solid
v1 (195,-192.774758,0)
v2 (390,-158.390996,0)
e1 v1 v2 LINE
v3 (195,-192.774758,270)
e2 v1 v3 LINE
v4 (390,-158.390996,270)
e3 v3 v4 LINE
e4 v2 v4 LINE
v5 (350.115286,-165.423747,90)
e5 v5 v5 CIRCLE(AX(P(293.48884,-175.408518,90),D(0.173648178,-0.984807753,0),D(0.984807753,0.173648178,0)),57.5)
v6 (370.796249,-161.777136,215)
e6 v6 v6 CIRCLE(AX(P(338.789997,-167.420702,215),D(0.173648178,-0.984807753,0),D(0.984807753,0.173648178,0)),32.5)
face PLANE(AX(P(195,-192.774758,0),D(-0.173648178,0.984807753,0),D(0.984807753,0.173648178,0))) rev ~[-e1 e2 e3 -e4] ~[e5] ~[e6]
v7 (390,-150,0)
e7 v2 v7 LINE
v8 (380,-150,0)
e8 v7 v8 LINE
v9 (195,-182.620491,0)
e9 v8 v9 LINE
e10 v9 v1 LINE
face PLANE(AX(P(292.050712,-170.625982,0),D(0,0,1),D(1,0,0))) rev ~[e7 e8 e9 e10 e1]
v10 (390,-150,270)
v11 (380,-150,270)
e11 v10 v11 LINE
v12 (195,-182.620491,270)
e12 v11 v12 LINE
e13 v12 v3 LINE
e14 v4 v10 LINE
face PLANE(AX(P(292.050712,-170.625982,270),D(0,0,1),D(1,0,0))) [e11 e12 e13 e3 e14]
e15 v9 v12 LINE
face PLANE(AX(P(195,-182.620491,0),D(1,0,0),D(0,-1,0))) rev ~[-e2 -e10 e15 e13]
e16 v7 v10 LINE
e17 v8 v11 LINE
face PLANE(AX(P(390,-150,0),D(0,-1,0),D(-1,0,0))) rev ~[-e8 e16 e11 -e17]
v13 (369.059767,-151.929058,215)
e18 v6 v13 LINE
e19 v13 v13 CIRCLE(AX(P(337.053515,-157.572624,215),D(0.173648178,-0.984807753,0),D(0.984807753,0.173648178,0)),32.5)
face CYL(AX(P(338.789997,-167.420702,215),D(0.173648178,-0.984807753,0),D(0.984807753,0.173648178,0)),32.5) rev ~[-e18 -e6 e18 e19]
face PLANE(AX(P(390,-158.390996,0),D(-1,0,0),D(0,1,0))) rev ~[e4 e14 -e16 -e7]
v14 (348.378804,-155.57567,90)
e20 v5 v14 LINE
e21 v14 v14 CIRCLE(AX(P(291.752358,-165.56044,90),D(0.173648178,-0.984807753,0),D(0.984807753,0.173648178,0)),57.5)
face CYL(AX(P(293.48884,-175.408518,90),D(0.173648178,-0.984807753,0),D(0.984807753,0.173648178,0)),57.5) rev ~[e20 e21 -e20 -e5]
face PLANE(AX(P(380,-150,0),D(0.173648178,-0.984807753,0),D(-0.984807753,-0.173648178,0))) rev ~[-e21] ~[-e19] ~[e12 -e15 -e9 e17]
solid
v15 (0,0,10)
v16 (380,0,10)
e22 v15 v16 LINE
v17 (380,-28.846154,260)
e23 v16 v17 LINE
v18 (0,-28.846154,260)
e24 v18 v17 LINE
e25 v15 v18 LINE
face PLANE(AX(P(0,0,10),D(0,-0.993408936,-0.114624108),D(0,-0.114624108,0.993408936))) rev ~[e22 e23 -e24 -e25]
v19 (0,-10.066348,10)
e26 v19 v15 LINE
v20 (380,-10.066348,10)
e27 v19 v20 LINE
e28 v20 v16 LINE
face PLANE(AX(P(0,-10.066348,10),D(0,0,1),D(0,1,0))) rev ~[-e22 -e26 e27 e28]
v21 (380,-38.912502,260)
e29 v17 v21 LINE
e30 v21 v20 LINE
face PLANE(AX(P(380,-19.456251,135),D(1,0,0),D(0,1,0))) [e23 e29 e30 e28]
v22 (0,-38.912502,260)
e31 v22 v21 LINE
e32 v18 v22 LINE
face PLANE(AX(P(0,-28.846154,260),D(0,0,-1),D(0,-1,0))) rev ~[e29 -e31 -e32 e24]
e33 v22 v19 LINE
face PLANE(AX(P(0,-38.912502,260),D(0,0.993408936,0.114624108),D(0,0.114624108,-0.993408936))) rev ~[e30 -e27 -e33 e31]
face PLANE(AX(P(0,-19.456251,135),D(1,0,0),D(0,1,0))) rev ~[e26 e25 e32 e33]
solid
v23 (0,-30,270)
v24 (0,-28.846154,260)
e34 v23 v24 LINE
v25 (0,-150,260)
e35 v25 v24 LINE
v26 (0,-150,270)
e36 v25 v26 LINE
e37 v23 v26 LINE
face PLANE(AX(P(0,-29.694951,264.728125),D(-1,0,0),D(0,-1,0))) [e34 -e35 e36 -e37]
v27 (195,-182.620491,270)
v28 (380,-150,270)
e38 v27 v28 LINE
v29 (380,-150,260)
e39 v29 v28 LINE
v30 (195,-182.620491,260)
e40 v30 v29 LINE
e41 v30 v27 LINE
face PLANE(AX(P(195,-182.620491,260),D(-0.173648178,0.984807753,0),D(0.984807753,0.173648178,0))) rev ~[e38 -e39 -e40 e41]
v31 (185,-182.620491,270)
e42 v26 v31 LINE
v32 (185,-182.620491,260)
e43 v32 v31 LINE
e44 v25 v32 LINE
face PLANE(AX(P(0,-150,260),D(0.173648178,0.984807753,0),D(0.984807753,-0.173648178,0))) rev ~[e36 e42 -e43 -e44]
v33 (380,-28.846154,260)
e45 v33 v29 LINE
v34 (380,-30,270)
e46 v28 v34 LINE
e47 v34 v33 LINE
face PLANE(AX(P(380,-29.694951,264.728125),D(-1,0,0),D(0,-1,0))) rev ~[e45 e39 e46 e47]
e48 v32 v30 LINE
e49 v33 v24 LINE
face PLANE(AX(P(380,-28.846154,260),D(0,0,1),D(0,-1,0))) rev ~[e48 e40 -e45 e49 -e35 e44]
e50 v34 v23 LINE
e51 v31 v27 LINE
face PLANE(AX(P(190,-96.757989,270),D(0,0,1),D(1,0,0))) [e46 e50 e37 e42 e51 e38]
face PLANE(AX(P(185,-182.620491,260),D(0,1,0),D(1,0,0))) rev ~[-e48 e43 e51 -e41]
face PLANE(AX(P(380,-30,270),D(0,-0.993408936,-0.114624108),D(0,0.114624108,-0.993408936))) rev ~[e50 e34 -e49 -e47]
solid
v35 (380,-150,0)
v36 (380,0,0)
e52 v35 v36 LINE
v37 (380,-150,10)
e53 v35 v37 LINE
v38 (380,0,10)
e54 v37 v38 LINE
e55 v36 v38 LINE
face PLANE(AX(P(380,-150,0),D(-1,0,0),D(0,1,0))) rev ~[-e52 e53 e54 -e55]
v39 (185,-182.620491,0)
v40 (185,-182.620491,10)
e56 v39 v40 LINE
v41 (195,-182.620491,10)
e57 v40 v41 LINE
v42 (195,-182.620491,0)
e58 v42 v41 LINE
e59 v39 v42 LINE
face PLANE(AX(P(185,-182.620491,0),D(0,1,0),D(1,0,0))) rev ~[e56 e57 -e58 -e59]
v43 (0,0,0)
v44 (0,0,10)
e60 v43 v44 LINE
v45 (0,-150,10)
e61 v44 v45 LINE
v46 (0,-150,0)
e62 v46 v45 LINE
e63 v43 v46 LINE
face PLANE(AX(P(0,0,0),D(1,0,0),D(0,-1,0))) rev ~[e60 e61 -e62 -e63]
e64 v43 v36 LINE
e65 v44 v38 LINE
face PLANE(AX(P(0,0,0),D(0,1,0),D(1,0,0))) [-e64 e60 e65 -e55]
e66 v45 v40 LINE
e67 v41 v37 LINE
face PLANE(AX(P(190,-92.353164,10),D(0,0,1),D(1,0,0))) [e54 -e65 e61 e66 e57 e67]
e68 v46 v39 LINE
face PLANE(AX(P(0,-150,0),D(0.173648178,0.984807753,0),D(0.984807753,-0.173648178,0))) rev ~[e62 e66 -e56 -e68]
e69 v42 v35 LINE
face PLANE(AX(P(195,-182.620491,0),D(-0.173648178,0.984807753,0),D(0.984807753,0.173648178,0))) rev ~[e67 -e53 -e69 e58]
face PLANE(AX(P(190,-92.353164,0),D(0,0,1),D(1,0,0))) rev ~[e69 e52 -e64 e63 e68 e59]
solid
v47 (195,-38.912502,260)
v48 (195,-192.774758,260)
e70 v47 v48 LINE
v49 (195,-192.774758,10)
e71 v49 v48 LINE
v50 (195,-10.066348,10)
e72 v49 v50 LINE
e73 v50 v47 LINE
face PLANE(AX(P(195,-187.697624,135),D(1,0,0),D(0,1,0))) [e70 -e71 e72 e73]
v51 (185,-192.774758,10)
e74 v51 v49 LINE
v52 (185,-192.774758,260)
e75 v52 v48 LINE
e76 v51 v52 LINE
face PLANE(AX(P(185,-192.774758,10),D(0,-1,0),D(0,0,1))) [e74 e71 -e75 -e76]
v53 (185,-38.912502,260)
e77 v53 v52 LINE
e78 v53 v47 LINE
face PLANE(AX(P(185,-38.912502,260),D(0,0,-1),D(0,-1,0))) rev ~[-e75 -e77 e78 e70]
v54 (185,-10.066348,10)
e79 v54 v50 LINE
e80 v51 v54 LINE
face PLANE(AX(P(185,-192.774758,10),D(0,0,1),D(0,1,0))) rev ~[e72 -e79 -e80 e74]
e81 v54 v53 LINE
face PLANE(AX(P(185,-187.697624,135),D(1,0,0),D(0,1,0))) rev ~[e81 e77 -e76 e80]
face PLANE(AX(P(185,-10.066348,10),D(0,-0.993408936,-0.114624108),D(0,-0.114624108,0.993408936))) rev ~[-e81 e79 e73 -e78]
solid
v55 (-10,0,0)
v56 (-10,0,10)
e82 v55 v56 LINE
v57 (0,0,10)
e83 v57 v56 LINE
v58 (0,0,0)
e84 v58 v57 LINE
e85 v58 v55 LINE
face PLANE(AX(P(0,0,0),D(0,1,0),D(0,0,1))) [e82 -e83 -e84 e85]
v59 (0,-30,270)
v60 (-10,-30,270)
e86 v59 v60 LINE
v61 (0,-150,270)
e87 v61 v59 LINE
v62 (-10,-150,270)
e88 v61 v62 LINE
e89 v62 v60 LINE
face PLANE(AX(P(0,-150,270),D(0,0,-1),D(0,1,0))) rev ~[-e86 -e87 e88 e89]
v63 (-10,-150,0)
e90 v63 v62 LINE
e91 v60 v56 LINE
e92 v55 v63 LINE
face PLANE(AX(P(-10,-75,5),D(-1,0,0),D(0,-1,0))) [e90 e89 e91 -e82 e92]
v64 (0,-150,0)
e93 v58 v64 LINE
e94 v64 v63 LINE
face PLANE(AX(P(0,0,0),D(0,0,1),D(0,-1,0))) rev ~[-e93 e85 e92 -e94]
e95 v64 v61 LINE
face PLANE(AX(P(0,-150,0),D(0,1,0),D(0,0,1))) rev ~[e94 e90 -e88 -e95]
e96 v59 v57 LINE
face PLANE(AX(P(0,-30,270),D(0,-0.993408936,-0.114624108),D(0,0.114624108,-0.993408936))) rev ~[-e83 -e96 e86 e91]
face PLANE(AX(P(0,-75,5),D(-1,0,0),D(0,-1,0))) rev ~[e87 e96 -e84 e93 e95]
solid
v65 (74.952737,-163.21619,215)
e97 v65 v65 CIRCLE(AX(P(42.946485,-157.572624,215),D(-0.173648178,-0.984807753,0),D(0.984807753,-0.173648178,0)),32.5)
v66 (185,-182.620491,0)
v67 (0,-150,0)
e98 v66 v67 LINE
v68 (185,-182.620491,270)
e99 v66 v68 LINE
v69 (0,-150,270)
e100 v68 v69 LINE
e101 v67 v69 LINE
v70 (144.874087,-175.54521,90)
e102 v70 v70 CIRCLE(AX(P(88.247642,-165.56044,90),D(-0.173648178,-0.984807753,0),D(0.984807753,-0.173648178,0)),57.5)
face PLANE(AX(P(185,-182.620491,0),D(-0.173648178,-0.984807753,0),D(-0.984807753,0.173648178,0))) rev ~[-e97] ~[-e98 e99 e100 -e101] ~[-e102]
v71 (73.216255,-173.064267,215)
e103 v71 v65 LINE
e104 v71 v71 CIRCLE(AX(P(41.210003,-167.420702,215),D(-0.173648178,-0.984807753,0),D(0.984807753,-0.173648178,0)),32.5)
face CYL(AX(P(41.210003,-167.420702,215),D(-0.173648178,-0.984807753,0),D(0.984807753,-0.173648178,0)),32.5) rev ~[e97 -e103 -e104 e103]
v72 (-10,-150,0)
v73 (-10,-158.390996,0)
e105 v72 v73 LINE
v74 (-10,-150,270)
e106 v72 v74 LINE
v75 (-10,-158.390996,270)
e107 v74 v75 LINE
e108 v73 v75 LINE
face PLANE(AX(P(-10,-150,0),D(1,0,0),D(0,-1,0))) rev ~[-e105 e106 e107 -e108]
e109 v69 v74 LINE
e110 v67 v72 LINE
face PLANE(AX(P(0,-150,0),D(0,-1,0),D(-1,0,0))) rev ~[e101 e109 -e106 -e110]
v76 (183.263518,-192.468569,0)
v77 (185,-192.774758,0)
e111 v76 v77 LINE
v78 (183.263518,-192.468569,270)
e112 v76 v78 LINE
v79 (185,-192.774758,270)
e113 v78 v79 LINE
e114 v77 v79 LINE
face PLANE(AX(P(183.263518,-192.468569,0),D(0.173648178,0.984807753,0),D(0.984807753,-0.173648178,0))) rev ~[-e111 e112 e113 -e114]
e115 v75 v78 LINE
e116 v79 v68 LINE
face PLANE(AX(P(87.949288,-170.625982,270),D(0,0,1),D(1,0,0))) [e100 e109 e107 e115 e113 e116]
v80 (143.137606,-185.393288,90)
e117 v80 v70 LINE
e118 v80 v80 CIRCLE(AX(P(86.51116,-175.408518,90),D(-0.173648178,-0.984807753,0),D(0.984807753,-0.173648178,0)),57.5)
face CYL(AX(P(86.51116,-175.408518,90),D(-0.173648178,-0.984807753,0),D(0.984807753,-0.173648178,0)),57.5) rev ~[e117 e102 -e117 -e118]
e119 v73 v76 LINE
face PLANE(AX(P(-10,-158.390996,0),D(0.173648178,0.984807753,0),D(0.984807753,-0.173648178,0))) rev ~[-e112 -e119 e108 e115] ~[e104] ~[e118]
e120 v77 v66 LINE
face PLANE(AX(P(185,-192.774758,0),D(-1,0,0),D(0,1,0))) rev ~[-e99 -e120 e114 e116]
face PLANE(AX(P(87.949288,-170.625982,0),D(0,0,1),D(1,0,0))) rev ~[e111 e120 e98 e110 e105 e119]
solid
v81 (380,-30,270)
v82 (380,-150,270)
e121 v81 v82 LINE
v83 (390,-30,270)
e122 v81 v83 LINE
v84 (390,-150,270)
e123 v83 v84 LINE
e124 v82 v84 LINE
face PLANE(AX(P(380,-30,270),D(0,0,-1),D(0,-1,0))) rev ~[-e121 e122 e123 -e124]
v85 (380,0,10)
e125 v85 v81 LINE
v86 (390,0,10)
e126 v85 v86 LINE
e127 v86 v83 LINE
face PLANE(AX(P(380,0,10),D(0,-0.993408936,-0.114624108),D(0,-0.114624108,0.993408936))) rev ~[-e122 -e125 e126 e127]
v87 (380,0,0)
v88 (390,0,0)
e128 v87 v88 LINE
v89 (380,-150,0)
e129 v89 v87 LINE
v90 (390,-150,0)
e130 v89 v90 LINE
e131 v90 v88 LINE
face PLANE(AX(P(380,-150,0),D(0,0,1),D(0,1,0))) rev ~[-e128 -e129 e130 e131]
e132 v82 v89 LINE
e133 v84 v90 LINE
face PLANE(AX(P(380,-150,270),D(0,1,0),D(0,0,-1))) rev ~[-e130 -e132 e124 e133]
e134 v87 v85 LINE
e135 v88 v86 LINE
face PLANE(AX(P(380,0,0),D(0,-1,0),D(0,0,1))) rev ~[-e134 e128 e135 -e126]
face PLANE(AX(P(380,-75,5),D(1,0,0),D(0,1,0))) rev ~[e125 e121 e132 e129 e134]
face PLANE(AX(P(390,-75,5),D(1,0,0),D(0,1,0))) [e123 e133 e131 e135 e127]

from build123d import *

# Parameters (mm, degrees)
F0_W      = 10
F0_H      = 120
F0_W_2    = 380
F0_H_2    = 10
F1_DEPTH  = 10
F2_DEPTH  = 270
F3_DEPTH  = 270
F6_W      = 150
F6_H      = 10
F7_DEPTH  = 10
F8_W      = 150
F8_H      = 10
F9_DEPTH  = 10
F11_DEPTH = 380
F12_DEPTH = 10
F13_R     = 32.5
F13_R_2   = 57.5
F14_DEPTH = 25
F15_R     = 57.5
F15_R_2   = 32.5
F16_DEPTH = 25
F17_W     = 10.1542661189
F17_H     = 250
F18_DEPTH = 10
F20_DEPTH = 380


# Not quite as in the source:
# - a feature names something its author has since deleted; it is built from what else it names


with BuildPart() as f1:
    # F0 (on Top) → F1 (new body)
    with BuildSketch(Plane.XY):
        Polygon((380, -10), (0, -10), (0, -150), (185, -182.6204914311), (185, -62.6204914311), (195, -62.6204914311), (195, -182.6204914311), (380, -150), align=None)
        with Locations((190, -122.6204914311)):
            Rectangle(F0_W, F0_H)
        with Locations((190, -5)):
            Rectangle(F0_W_2, F0_H_2)
    extrude(amount=F1_DEPTH)


with BuildPart() as f2:
    # F0 (on Top) → F2 (new body)
    with BuildSketch(Plane.XY):
        Polygon((185, -182.6204914311), (0, -150), (-10, -150), (-10, -158.3909963118), (183.2635182233, -192.4685689612), (185, -192.7747575499), align=None)
    extrude(amount=F2_DEPTH)

    # F13 (on face) → F14 (cut)
    with BuildSketch(Plane(origin=(-27.3879925261, -155.3250240891, 0), x_dir=(0.984807753, -0.1736481777, 0), z_dir=(-0.1736481777, -0.984807753, 0))):
        with Locations((69.6562303383, 215)):
            Circle(F13_R)
        with Locations((115.6562303383, 90)):
            Circle(F13_R_2)
    extrude(amount=-F14_DEPTH, mode=Mode.SUBTRACT)


with BuildPart() as f3:
    # F0 (on Top) → F3 (new body)
    with BuildSketch(Plane.XY):
        Polygon((390, -150), (380, -150), (195, -182.6204914311), (195, -192.7747575499), (390, -158.3909963118), align=None)
    extrude(amount=F3_DEPTH)

    # F15 (on face) → F16 (cut)
    with BuildSketch(Plane(origin=(38.8463945768, -220.3088513209, 0), x_dir=(0.984807753, 0.1736481777, 0), z_dir=(0.1736481777, -0.984807753, 0))):
        with Locations((258.5707158064, 90)):
            Circle(F15_R)
        with Locations((304.5707158064, 215)):
            Circle(F15_R_2)
    extrude(amount=-F16_DEPTH, mode=Mode.SUBTRACT)


with BuildPart() as f7:
    # F6 (on face) → F7 (new body)
    with BuildSketch(Plane(origin=(0, 0, 0), x_dir=(0, -1, 0), z_dir=(-1, 0, 0))):
        with Locations((75, 5)):
            Rectangle(F6_W, F6_H)
        Polygon((30, 270), (0, 10), (150, 10), (150, 270), align=None)
    extrude(amount=F7_DEPTH)


with BuildPart() as f9:
    # F8 (on face) → F9 (new body)
    with BuildSketch(Plane.YZ.offset(380)):
        with Locations((-75, 5)):
            Rectangle(F8_W, F8_H)
        Polygon((-150, 270), (-150, 10), (0, 10), (-30, 270), align=None)
    extrude(amount=F9_DEPTH)


with BuildPart() as f11:
    # F10 (on face) → F11 (new body)
    with BuildSketch(Plane.YZ):
        Polygon((0, 10), (-28.8461538462, 260), (-38.912501791, 260), (-10.0663479448, 10), align=None)
    extrude(amount=F11_DEPTH)


with BuildPart() as f12:
    # F5 (on offset) → F12 (new body)
    with BuildSketch(Plane.XY.offset(260)):
        Polygon((195, -182.6204914311), (380, -150), (380, -30), (0, -30), (0, -150), (185, -182.6204914311), align=None)
    extrude(amount=F12_DEPTH)

    # F19 (on face) → F20 (join)
    with BuildSketch(Plane(origin=(380, 0, 0), x_dir=(0, -1, 0), z_dir=(-1, 0, 0))):
        Polygon((30, 260), (30, 270), (28.8461538462, 260), align=None)
    extrude(amount=F20_DEPTH)


with BuildPart() as f18:
    # F17 (on face) → F18 (new body)
    with BuildSketch(Plane.YZ.offset(185)):
        with Locations((-187.6976244905, 135)):
            Rectangle(F17_W, F17_H)
        Polygon((-10.0663479448, 10), (-38.912501791, 260), (-182.6204914311, 260), (-182.6204914311, 10), (-150, 10), align=None)
    extrude(amount=F18_DEPTH)


solid = Compound([f1.part, f2.part, f3.part, f7.part, f9.part, f11.part, f12.part, f18.part])
